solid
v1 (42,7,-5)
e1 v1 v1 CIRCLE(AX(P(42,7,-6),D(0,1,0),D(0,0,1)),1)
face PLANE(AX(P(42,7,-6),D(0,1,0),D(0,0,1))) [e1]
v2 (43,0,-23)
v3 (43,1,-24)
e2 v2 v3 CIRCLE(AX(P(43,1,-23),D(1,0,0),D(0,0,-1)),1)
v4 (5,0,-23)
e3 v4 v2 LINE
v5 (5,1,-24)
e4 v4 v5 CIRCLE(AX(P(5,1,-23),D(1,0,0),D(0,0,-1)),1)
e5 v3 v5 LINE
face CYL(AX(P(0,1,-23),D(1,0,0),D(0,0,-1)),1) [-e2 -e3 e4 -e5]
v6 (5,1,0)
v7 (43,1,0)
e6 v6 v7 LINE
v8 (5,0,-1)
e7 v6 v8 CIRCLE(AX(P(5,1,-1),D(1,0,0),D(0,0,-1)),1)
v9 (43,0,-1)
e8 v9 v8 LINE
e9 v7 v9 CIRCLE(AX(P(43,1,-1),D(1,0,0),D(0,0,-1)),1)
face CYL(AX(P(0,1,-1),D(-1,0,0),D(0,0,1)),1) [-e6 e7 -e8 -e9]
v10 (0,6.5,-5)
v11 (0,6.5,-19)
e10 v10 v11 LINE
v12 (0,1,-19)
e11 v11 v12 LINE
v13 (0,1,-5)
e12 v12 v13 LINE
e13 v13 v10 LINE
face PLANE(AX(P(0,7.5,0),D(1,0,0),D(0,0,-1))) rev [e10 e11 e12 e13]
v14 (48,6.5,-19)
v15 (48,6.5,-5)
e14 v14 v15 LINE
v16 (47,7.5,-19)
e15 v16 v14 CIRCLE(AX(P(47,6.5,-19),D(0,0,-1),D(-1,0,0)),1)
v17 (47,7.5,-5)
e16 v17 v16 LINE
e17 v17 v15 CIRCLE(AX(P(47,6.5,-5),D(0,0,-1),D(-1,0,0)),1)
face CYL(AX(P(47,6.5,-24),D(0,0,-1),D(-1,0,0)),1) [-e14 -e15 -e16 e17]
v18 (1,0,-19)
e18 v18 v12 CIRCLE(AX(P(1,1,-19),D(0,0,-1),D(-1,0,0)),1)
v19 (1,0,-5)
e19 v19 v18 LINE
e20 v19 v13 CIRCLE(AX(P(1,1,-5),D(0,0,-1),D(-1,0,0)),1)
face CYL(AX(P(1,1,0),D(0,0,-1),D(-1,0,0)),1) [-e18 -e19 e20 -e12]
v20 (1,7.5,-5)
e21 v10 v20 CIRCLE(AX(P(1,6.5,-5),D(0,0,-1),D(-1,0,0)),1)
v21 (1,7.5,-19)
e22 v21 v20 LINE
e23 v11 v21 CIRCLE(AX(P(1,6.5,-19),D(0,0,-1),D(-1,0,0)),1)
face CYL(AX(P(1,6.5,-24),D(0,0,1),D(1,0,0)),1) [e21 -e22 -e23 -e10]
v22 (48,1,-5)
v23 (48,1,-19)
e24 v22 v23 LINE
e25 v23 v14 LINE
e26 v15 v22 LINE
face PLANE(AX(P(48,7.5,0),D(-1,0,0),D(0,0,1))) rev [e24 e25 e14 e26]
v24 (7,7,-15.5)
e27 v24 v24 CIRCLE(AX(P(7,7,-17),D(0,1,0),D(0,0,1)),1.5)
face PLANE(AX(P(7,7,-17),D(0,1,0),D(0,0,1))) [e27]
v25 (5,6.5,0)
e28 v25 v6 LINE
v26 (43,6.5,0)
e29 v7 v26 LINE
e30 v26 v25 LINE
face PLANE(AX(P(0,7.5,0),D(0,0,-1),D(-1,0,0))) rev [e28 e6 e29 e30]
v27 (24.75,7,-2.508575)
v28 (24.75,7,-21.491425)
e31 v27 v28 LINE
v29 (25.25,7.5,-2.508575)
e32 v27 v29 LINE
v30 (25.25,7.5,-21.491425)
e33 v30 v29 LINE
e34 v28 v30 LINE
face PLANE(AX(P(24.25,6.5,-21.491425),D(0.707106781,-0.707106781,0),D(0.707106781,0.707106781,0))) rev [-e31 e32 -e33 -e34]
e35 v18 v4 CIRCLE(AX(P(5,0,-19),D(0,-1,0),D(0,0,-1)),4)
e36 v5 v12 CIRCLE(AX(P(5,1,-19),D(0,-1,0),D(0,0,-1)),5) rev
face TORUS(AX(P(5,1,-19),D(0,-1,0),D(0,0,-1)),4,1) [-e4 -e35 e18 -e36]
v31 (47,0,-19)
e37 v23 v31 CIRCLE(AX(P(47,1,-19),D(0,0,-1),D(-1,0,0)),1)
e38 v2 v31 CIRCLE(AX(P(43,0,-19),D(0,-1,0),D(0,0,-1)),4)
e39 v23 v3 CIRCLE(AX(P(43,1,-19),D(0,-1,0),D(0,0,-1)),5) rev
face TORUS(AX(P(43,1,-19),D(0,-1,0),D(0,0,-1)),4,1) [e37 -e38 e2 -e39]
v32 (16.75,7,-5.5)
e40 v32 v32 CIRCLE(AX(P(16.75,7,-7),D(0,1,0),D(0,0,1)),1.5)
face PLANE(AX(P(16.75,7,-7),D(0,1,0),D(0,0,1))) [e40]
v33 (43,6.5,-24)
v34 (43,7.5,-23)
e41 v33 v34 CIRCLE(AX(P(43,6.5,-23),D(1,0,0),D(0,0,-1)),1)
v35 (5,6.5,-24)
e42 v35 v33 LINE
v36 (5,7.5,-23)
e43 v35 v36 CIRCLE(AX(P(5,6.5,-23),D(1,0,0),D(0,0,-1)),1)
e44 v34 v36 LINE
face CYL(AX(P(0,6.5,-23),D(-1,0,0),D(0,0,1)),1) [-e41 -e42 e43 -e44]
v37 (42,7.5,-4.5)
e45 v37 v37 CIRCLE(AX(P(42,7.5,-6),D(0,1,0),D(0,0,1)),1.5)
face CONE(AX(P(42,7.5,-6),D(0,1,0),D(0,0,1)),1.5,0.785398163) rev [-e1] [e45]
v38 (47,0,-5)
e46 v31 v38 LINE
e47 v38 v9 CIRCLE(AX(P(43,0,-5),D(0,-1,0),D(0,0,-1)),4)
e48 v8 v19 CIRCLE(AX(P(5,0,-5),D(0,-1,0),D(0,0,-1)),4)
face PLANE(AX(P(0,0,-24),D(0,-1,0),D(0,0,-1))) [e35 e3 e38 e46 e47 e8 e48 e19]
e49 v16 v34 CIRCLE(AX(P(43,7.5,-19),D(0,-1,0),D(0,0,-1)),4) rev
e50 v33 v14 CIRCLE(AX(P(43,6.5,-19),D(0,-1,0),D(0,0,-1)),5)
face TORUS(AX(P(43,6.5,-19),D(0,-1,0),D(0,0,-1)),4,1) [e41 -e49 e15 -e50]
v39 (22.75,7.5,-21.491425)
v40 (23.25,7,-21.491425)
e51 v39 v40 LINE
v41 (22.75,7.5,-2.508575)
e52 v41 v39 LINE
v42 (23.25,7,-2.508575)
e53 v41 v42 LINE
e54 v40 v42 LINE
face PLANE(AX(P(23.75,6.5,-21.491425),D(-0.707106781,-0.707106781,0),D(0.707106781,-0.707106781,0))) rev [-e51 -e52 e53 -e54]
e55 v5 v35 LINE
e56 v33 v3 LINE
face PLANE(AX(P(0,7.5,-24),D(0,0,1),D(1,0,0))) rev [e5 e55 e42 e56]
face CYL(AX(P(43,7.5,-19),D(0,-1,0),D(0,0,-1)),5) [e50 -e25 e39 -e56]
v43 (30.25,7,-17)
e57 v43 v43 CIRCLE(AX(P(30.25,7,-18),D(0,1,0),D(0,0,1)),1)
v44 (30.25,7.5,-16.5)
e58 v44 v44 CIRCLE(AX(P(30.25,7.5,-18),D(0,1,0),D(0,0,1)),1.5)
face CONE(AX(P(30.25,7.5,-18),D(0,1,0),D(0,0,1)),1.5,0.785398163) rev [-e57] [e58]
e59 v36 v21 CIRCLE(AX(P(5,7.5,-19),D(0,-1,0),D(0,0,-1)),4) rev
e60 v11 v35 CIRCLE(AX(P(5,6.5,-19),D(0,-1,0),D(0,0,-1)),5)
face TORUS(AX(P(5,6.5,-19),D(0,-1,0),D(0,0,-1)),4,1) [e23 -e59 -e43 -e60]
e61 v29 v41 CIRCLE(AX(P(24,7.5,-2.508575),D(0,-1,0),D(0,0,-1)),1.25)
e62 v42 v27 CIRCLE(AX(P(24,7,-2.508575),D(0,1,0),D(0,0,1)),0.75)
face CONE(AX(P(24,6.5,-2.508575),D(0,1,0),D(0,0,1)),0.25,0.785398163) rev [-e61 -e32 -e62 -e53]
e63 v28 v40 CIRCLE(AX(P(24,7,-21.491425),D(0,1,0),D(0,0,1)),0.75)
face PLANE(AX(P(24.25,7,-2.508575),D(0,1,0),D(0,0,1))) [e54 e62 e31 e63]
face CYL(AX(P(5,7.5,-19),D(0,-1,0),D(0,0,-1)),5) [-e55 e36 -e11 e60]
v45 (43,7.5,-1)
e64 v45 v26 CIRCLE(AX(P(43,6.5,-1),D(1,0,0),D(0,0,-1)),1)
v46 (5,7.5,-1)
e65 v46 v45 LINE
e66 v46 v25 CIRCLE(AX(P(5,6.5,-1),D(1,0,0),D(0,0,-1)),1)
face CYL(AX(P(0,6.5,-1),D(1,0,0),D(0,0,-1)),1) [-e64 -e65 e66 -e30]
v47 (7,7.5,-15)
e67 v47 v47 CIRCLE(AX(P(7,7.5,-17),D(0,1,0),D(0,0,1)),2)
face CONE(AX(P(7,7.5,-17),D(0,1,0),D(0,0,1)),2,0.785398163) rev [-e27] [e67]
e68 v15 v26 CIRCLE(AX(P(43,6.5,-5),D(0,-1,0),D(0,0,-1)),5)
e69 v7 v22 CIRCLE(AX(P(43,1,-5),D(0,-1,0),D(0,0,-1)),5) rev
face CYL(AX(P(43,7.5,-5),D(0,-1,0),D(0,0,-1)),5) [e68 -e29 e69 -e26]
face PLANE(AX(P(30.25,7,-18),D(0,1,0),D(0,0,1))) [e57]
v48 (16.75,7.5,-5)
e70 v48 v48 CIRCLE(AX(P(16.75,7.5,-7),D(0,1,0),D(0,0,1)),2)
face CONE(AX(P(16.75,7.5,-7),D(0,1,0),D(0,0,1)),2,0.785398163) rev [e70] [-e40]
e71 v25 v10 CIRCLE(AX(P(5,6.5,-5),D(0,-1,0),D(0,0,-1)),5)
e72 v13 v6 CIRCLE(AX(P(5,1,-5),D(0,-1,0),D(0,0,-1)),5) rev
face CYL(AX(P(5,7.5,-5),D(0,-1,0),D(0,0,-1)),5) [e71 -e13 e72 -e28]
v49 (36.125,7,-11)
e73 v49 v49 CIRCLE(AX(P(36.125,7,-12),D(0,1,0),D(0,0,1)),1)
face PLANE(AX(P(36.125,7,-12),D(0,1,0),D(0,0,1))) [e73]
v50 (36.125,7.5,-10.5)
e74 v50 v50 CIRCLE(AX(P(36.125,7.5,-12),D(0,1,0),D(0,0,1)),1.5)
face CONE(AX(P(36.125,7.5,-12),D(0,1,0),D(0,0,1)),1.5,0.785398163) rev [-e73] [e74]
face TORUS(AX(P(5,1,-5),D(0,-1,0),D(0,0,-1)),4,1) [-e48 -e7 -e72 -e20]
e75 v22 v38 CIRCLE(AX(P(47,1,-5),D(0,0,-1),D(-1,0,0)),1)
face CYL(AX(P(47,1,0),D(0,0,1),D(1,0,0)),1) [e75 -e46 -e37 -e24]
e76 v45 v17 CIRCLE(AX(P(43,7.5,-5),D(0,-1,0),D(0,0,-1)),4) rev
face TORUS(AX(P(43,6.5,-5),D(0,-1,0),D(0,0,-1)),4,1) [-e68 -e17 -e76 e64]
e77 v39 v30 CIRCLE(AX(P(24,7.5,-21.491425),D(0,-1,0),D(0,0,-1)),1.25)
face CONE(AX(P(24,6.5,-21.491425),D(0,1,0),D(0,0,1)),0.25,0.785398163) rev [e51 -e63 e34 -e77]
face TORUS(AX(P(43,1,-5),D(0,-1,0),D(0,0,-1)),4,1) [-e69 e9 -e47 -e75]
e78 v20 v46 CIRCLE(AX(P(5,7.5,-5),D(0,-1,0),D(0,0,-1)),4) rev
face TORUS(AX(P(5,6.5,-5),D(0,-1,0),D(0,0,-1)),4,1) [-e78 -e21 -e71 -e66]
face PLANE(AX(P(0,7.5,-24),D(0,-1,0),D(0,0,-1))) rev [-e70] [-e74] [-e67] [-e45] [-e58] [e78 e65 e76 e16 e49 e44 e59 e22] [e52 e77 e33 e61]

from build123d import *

# Parameters (mm, degrees)
ESQUISSE1_W                = 48
ESQUISSE1_H                = 24
EXTRUSION1_DEPTH           = 7.5
CONG_2_R                   = 5
CONG_5_R                   = 1
CONG_6_R                   = 1
ESQUISSE4_W                = 0.5
ESQUISSE4_H                = 18.982849842
EXTRUSION2_DEPTH           = 0.5
ESQUISSE5_R                = 0.25
EXTRUSION3_DEPTH           = 0.5
CHANFREIN1_SIZE            = 1
ESQUISSE9_R                = 1.5
EXTRUSION6_DEPTH           = 0.5
EXTRUSION6_DRAFT           = -45
EXTRUSION6_PROFILE_2_DEPTH = 0.5
EXTRUSION6_PROFILE_2_DRAFT = -45
EXTRUSION6_PROFILE_3_DEPTH = 0.5
EXTRUSION6_PROFILE_3_DRAFT = -45
ESQUISSE10_R               = 2
EXTRUSION7_DEPTH           = 0.5
EXTRUSION7_DRAFT           = -45
EXTRUSION7_PROFILE_2_DEPTH = 0.5
EXTRUSION7_PROFILE_2_DRAFT = -45


with BuildPart() as part:
    # Esquisse1 → Extrusion1 (new body)
    with BuildSketch(Plane(origin=(0, 0, 0), x_dir=(1, 0, 0), z_dir=(0, 1, 0))):
        with Locations((24, 12)):
            Rectangle(ESQUISSE1_W, ESQUISSE1_H)
    extrude(amount=EXTRUSION1_DEPTH)

    # Congé2
    cong_2_edges = [part.edges().sort_by_distance(p)[0] for p in [
        (0, 3.75, -24),
        (48, 3.75, -24),
        (48, 3.75, 0),
        (0, 3.75, 0),
    ]]
    fillet(cong_2_edges, radius=CONG_2_R)

    # Congé5
    cong_5_edges = [part.edges().sort_by_distance(p)[0] for p in [
        (48, 7.5, -12),
        (24, 7.5, 0),
        (0, 7.5, -12),
        (24, 7.5, -24),
        (1.464466094, 7.5, -22.535533906),
        (1.464466094, 7.5, -1.464466094),
        (46.535533906, 7.5, -22.535533906),
        (46.535533906, 7.5, -1.464466094),
    ]]
    fillet(cong_5_edges, radius=CONG_5_R)

    # Congé6
    cong_6_edges = [part.edges().sort_by_distance(p)[0] for p in [
        (48, 0, -12),
        (0, 0, -12),
        (24, 0, -24),
        (24, 0, 0),
        (1.464466094, 0, -22.535533906),
        (1.464466094, 0, -1.464466094),
        (46.535533906, 0, -22.535533906),
        (46.535533906, 0, -1.464466094),
    ]]
    fillet(cong_6_edges, radius=CONG_6_R)

    # Esquisse4 → Extrusion2 (cut)
    with BuildSketch(Plane(origin=(0, 7.5, 0), x_dir=(1, 0, 0), z_dir=(0, 1, 0))):
        with Locations((24, 12)):
            Rectangle(ESQUISSE4_W, ESQUISSE4_H)
    extrude(amount=-EXTRUSION2_DEPTH, mode=Mode.SUBTRACT)

    # Esquisse5 → Extrusion3 (cut)
    with BuildSketch(Plane(origin=(0, 7.5, 0), x_dir=(1, 0, 0), z_dir=(0, 1, 0))):
        with Locations((24, 21.491424921)):
            Circle(ESQUISSE5_R)
        with Locations((24, 2.508575079)):
            Circle(ESQUISSE5_R)
    extrude(amount=-EXTRUSION3_DEPTH, mode=Mode.SUBTRACT)

    # Chanfrein1
    # the kernel refuses this chamfer: 1 mm, written as the material it takes off along each edge
    with BuildSketch(Plane(origin=(24, 7.5, -21.491424921), x_dir=(1, 0, 0), z_dir=(0, 0, 1))) as chanfrein1_piece_1_section:
        Polygon((0.25 + CHANFREIN1_SIZE, 0), (0.25, -CHANFREIN1_SIZE), (0.25, 0), align=None)
    chanfrein1_piece_1 = revolve(axis=Axis((24, 7.5, -21.491424921), (0, 1, 0)), revolution_arc=180, mode=Mode.PRIVATE)
    chanfrein1_piece_1 = split(chanfrein1_piece_1, bisect_by=Plane(origin=(24, 7, -21.964580549), z_dir=(0, 1, 0)), keep=Keep.TOP, mode=Mode.PRIVATE)
    add(chanfrein1_piece_1, mode=Mode.SUBTRACT)
    with BuildSketch(Plane(origin=(24.25, 7.5, -21.491424921), x_dir=(0.9996219169112968, 0.02749587661058651, 0), z_dir=(0, 0, 1))) as chanfrein1_piece_2_section:
        Polygon((CHANFREIN1_SIZE * 0.999621916911, -CHANFREIN1_SIZE * 0.0274958766106), (-CHANFREIN1_SIZE * 0.0274958766106, -CHANFREIN1_SIZE * 0.999621916911), (0, 0), align=None)
    chanfrein1_piece_2 = extrude(amount=18.982849842, mode=Mode.PRIVATE)
    chanfrein1_piece_2 = split(chanfrein1_piece_2, bisect_by=Plane(origin=(24.643401084, 7, -12), z_dir=(0, 1, 0)), keep=Keep.TOP, mode=Mode.PRIVATE)
    add(chanfrein1_piece_2, mode=Mode.SUBTRACT)
    with BuildSketch(Plane(origin=(24, 7.5, -2.508575079), x_dir=(-1, 0, 0), z_dir=(0, 0, -1))) as chanfrein1_piece_3_section:
        Polygon((0.25 + CHANFREIN1_SIZE, 0), (0.25, -CHANFREIN1_SIZE), (0.25, 0), align=None)
    chanfrein1_piece_3 = revolve(axis=Axis((24, 7.5, -2.508575079), (0, 1, 0)), revolution_arc=180, mode=Mode.PRIVATE)
    chanfrein1_piece_3 = split(chanfrein1_piece_3, bisect_by=Plane(origin=(24, 7, -2.035419451), z_dir=(0, 1, 0)), keep=Keep.TOP, mode=Mode.PRIVATE)
    add(chanfrein1_piece_3, mode=Mode.SUBTRACT)
    with BuildSketch(Plane(origin=(23.75, 7.5, -2.508575079), x_dir=(-0.9996219169112968, 0.02749587661058651, 0), z_dir=(0, 0, -1))) as chanfrein1_piece_4_section:
        Polygon((CHANFREIN1_SIZE * 0.999621916911, -CHANFREIN1_SIZE * 0.0274958766106), (-CHANFREIN1_SIZE * 0.0274958766106, -CHANFREIN1_SIZE * 0.999621916911), (0, 0), align=None)
    chanfrein1_piece_4 = extrude(amount=18.982849842, mode=Mode.PRIVATE)
    chanfrein1_piece_4 = split(chanfrein1_piece_4, bisect_by=Plane(origin=(23.356598916, 7, -12), z_dir=(0, 1, 0)), keep=Keep.TOP, mode=Mode.PRIVATE)
    add(chanfrein1_piece_4, mode=Mode.SUBTRACT)


with BuildPart() as extrusion6_tool:
    # Esquisse9 → Extrusion6 (with draft: the straight prism first)
    with BuildSketch(Plane(origin=(0, 7.5, 0), x_dir=(1, 0, 0), z_dir=(0, 1, 0))):
        with Locations((30.25, 18)):
            Circle(ESQUISSE9_R)
    extrude(amount=-EXTRUSION6_DEPTH)
    # Extrusion6: the draft: its side faces are tilted about the plane it starts from
    extrusion6_sides = [extrusion6_tool.faces().sort_by_distance(p)[0] for p in [
        (28.75, 7.25, -18),
    ]]
    draft(extrusion6_sides, Plane(origin=(0, 7.5, 0), x_dir=(1, 0, 0), z_dir=(0, 1, 0)), EXTRUSION6_DRAFT)


with BuildPart() as part_1:
    add(part.part)

    # Extrusion6: cut by extrusion6_tool
    add(extrusion6_tool.part, mode=Mode.SUBTRACT)


with BuildPart() as extrusion6_profile_2_tool:
    # Esquisse9 → Extrusion6 profile 2 (with draft: the straight prism first)
    with BuildSketch(Plane(origin=(0, 7.5, 0), x_dir=(1, 0, 0), z_dir=(0, 1, 0))):
        with Locations((36.125, 12)):
            Circle(ESQUISSE9_R)
    extrude(amount=-EXTRUSION6_PROFILE_2_DEPTH)
    # Extrusion6 profile 2: the draft: its side faces are tilted about the plane it starts from
    extrusion6_profile_2_sides = [extrusion6_profile_2_tool.faces().sort_by_distance(p)[0] for p in [
        (34.625, 7.25, -12),
    ]]
    draft(extrusion6_profile_2_sides, Plane(origin=(0, 7.5, 0), x_dir=(1, 0, 0), z_dir=(0, 1, 0)), EXTRUSION6_PROFILE_2_DRAFT)


with BuildPart() as part_2:
    add(part_1.part)

    # Extrusion6 profile 2: cut by extrusion6_profile_2_tool
    add(extrusion6_profile_2_tool.part, mode=Mode.SUBTRACT)


with BuildPart() as extrusion6_profile_3_tool:
    # Esquisse9 → Extrusion6 profile 3 (with draft: the straight prism first)
    with BuildSketch(Plane(origin=(0, 7.5, 0), x_dir=(1, 0, 0), z_dir=(0, 1, 0))):
        with Locations((42, 6)):
            Circle(ESQUISSE9_R)
    extrude(amount=-EXTRUSION6_PROFILE_3_DEPTH)
    # Extrusion6 profile 3: the draft: its side faces are tilted about the plane it starts from
    extrusion6_profile_3_sides = [extrusion6_profile_3_tool.faces().sort_by_distance(p)[0] for p in [
        (40.5, 7.25, -6),
    ]]
    draft(extrusion6_profile_3_sides, Plane(origin=(0, 7.5, 0), x_dir=(1, 0, 0), z_dir=(0, 1, 0)), EXTRUSION6_PROFILE_3_DRAFT)


with BuildPart() as part_3:
    add(part_2.part)

    # Extrusion6 profile 3: cut by extrusion6_profile_3_tool
    add(extrusion6_profile_3_tool.part, mode=Mode.SUBTRACT)


with BuildPart() as extrusion7_tool:
    # Esquisse10 → Extrusion7 (with draft: the straight prism first)
    with BuildSketch(Plane(origin=(0, 7.5, 0), x_dir=(1, 0, 0), z_dir=(0, 1, 0))):
        with Locations((7, 17)):
            Circle(ESQUISSE10_R)
    extrude(amount=-EXTRUSION7_DEPTH)
    # Extrusion7: the draft: its side faces are tilted about the plane it starts from
    extrusion7_sides = [extrusion7_tool.faces().sort_by_distance(p)[0] for p in [
        (5, 7.25, -17),
    ]]
    draft(extrusion7_sides, Plane(origin=(0, 7.5, 0), x_dir=(1, 0, 0), z_dir=(0, 1, 0)), EXTRUSION7_DRAFT)


with BuildPart() as part_4:
    add(part_3.part)

    # Extrusion7: cut by extrusion7_tool
    add(extrusion7_tool.part, mode=Mode.SUBTRACT)


with BuildPart() as extrusion7_profile_2_tool:
    # Esquisse10 → Extrusion7 profile 2 (with draft: the straight prism first)
    with BuildSketch(Plane(origin=(0, 7.5, 0), x_dir=(1, 0, 0), z_dir=(0, 1, 0))):
        with Locations((16.75, 7)):
            Circle(ESQUISSE10_R)
    extrude(amount=-EXTRUSION7_PROFILE_2_DEPTH)
    # Extrusion7 profile 2: the draft: its side faces are tilted about the plane it starts from
    extrusion7_profile_2_sides = [extrusion7_profile_2_tool.faces().sort_by_distance(p)[0] for p in [
        (14.75, 7.25, -7),
    ]]
    draft(extrusion7_profile_2_sides, Plane(origin=(0, 7.5, 0), x_dir=(1, 0, 0), z_dir=(0, 1, 0)), EXTRUSION7_PROFILE_2_DRAFT)


with BuildPart() as part_5:
    add(part_4.part)

    # Extrusion7 profile 2: cut by extrusion7_profile_2_tool
    add(extrusion7_profile_2_tool.part, mode=Mode.SUBTRACT)


solid = part_5.part
